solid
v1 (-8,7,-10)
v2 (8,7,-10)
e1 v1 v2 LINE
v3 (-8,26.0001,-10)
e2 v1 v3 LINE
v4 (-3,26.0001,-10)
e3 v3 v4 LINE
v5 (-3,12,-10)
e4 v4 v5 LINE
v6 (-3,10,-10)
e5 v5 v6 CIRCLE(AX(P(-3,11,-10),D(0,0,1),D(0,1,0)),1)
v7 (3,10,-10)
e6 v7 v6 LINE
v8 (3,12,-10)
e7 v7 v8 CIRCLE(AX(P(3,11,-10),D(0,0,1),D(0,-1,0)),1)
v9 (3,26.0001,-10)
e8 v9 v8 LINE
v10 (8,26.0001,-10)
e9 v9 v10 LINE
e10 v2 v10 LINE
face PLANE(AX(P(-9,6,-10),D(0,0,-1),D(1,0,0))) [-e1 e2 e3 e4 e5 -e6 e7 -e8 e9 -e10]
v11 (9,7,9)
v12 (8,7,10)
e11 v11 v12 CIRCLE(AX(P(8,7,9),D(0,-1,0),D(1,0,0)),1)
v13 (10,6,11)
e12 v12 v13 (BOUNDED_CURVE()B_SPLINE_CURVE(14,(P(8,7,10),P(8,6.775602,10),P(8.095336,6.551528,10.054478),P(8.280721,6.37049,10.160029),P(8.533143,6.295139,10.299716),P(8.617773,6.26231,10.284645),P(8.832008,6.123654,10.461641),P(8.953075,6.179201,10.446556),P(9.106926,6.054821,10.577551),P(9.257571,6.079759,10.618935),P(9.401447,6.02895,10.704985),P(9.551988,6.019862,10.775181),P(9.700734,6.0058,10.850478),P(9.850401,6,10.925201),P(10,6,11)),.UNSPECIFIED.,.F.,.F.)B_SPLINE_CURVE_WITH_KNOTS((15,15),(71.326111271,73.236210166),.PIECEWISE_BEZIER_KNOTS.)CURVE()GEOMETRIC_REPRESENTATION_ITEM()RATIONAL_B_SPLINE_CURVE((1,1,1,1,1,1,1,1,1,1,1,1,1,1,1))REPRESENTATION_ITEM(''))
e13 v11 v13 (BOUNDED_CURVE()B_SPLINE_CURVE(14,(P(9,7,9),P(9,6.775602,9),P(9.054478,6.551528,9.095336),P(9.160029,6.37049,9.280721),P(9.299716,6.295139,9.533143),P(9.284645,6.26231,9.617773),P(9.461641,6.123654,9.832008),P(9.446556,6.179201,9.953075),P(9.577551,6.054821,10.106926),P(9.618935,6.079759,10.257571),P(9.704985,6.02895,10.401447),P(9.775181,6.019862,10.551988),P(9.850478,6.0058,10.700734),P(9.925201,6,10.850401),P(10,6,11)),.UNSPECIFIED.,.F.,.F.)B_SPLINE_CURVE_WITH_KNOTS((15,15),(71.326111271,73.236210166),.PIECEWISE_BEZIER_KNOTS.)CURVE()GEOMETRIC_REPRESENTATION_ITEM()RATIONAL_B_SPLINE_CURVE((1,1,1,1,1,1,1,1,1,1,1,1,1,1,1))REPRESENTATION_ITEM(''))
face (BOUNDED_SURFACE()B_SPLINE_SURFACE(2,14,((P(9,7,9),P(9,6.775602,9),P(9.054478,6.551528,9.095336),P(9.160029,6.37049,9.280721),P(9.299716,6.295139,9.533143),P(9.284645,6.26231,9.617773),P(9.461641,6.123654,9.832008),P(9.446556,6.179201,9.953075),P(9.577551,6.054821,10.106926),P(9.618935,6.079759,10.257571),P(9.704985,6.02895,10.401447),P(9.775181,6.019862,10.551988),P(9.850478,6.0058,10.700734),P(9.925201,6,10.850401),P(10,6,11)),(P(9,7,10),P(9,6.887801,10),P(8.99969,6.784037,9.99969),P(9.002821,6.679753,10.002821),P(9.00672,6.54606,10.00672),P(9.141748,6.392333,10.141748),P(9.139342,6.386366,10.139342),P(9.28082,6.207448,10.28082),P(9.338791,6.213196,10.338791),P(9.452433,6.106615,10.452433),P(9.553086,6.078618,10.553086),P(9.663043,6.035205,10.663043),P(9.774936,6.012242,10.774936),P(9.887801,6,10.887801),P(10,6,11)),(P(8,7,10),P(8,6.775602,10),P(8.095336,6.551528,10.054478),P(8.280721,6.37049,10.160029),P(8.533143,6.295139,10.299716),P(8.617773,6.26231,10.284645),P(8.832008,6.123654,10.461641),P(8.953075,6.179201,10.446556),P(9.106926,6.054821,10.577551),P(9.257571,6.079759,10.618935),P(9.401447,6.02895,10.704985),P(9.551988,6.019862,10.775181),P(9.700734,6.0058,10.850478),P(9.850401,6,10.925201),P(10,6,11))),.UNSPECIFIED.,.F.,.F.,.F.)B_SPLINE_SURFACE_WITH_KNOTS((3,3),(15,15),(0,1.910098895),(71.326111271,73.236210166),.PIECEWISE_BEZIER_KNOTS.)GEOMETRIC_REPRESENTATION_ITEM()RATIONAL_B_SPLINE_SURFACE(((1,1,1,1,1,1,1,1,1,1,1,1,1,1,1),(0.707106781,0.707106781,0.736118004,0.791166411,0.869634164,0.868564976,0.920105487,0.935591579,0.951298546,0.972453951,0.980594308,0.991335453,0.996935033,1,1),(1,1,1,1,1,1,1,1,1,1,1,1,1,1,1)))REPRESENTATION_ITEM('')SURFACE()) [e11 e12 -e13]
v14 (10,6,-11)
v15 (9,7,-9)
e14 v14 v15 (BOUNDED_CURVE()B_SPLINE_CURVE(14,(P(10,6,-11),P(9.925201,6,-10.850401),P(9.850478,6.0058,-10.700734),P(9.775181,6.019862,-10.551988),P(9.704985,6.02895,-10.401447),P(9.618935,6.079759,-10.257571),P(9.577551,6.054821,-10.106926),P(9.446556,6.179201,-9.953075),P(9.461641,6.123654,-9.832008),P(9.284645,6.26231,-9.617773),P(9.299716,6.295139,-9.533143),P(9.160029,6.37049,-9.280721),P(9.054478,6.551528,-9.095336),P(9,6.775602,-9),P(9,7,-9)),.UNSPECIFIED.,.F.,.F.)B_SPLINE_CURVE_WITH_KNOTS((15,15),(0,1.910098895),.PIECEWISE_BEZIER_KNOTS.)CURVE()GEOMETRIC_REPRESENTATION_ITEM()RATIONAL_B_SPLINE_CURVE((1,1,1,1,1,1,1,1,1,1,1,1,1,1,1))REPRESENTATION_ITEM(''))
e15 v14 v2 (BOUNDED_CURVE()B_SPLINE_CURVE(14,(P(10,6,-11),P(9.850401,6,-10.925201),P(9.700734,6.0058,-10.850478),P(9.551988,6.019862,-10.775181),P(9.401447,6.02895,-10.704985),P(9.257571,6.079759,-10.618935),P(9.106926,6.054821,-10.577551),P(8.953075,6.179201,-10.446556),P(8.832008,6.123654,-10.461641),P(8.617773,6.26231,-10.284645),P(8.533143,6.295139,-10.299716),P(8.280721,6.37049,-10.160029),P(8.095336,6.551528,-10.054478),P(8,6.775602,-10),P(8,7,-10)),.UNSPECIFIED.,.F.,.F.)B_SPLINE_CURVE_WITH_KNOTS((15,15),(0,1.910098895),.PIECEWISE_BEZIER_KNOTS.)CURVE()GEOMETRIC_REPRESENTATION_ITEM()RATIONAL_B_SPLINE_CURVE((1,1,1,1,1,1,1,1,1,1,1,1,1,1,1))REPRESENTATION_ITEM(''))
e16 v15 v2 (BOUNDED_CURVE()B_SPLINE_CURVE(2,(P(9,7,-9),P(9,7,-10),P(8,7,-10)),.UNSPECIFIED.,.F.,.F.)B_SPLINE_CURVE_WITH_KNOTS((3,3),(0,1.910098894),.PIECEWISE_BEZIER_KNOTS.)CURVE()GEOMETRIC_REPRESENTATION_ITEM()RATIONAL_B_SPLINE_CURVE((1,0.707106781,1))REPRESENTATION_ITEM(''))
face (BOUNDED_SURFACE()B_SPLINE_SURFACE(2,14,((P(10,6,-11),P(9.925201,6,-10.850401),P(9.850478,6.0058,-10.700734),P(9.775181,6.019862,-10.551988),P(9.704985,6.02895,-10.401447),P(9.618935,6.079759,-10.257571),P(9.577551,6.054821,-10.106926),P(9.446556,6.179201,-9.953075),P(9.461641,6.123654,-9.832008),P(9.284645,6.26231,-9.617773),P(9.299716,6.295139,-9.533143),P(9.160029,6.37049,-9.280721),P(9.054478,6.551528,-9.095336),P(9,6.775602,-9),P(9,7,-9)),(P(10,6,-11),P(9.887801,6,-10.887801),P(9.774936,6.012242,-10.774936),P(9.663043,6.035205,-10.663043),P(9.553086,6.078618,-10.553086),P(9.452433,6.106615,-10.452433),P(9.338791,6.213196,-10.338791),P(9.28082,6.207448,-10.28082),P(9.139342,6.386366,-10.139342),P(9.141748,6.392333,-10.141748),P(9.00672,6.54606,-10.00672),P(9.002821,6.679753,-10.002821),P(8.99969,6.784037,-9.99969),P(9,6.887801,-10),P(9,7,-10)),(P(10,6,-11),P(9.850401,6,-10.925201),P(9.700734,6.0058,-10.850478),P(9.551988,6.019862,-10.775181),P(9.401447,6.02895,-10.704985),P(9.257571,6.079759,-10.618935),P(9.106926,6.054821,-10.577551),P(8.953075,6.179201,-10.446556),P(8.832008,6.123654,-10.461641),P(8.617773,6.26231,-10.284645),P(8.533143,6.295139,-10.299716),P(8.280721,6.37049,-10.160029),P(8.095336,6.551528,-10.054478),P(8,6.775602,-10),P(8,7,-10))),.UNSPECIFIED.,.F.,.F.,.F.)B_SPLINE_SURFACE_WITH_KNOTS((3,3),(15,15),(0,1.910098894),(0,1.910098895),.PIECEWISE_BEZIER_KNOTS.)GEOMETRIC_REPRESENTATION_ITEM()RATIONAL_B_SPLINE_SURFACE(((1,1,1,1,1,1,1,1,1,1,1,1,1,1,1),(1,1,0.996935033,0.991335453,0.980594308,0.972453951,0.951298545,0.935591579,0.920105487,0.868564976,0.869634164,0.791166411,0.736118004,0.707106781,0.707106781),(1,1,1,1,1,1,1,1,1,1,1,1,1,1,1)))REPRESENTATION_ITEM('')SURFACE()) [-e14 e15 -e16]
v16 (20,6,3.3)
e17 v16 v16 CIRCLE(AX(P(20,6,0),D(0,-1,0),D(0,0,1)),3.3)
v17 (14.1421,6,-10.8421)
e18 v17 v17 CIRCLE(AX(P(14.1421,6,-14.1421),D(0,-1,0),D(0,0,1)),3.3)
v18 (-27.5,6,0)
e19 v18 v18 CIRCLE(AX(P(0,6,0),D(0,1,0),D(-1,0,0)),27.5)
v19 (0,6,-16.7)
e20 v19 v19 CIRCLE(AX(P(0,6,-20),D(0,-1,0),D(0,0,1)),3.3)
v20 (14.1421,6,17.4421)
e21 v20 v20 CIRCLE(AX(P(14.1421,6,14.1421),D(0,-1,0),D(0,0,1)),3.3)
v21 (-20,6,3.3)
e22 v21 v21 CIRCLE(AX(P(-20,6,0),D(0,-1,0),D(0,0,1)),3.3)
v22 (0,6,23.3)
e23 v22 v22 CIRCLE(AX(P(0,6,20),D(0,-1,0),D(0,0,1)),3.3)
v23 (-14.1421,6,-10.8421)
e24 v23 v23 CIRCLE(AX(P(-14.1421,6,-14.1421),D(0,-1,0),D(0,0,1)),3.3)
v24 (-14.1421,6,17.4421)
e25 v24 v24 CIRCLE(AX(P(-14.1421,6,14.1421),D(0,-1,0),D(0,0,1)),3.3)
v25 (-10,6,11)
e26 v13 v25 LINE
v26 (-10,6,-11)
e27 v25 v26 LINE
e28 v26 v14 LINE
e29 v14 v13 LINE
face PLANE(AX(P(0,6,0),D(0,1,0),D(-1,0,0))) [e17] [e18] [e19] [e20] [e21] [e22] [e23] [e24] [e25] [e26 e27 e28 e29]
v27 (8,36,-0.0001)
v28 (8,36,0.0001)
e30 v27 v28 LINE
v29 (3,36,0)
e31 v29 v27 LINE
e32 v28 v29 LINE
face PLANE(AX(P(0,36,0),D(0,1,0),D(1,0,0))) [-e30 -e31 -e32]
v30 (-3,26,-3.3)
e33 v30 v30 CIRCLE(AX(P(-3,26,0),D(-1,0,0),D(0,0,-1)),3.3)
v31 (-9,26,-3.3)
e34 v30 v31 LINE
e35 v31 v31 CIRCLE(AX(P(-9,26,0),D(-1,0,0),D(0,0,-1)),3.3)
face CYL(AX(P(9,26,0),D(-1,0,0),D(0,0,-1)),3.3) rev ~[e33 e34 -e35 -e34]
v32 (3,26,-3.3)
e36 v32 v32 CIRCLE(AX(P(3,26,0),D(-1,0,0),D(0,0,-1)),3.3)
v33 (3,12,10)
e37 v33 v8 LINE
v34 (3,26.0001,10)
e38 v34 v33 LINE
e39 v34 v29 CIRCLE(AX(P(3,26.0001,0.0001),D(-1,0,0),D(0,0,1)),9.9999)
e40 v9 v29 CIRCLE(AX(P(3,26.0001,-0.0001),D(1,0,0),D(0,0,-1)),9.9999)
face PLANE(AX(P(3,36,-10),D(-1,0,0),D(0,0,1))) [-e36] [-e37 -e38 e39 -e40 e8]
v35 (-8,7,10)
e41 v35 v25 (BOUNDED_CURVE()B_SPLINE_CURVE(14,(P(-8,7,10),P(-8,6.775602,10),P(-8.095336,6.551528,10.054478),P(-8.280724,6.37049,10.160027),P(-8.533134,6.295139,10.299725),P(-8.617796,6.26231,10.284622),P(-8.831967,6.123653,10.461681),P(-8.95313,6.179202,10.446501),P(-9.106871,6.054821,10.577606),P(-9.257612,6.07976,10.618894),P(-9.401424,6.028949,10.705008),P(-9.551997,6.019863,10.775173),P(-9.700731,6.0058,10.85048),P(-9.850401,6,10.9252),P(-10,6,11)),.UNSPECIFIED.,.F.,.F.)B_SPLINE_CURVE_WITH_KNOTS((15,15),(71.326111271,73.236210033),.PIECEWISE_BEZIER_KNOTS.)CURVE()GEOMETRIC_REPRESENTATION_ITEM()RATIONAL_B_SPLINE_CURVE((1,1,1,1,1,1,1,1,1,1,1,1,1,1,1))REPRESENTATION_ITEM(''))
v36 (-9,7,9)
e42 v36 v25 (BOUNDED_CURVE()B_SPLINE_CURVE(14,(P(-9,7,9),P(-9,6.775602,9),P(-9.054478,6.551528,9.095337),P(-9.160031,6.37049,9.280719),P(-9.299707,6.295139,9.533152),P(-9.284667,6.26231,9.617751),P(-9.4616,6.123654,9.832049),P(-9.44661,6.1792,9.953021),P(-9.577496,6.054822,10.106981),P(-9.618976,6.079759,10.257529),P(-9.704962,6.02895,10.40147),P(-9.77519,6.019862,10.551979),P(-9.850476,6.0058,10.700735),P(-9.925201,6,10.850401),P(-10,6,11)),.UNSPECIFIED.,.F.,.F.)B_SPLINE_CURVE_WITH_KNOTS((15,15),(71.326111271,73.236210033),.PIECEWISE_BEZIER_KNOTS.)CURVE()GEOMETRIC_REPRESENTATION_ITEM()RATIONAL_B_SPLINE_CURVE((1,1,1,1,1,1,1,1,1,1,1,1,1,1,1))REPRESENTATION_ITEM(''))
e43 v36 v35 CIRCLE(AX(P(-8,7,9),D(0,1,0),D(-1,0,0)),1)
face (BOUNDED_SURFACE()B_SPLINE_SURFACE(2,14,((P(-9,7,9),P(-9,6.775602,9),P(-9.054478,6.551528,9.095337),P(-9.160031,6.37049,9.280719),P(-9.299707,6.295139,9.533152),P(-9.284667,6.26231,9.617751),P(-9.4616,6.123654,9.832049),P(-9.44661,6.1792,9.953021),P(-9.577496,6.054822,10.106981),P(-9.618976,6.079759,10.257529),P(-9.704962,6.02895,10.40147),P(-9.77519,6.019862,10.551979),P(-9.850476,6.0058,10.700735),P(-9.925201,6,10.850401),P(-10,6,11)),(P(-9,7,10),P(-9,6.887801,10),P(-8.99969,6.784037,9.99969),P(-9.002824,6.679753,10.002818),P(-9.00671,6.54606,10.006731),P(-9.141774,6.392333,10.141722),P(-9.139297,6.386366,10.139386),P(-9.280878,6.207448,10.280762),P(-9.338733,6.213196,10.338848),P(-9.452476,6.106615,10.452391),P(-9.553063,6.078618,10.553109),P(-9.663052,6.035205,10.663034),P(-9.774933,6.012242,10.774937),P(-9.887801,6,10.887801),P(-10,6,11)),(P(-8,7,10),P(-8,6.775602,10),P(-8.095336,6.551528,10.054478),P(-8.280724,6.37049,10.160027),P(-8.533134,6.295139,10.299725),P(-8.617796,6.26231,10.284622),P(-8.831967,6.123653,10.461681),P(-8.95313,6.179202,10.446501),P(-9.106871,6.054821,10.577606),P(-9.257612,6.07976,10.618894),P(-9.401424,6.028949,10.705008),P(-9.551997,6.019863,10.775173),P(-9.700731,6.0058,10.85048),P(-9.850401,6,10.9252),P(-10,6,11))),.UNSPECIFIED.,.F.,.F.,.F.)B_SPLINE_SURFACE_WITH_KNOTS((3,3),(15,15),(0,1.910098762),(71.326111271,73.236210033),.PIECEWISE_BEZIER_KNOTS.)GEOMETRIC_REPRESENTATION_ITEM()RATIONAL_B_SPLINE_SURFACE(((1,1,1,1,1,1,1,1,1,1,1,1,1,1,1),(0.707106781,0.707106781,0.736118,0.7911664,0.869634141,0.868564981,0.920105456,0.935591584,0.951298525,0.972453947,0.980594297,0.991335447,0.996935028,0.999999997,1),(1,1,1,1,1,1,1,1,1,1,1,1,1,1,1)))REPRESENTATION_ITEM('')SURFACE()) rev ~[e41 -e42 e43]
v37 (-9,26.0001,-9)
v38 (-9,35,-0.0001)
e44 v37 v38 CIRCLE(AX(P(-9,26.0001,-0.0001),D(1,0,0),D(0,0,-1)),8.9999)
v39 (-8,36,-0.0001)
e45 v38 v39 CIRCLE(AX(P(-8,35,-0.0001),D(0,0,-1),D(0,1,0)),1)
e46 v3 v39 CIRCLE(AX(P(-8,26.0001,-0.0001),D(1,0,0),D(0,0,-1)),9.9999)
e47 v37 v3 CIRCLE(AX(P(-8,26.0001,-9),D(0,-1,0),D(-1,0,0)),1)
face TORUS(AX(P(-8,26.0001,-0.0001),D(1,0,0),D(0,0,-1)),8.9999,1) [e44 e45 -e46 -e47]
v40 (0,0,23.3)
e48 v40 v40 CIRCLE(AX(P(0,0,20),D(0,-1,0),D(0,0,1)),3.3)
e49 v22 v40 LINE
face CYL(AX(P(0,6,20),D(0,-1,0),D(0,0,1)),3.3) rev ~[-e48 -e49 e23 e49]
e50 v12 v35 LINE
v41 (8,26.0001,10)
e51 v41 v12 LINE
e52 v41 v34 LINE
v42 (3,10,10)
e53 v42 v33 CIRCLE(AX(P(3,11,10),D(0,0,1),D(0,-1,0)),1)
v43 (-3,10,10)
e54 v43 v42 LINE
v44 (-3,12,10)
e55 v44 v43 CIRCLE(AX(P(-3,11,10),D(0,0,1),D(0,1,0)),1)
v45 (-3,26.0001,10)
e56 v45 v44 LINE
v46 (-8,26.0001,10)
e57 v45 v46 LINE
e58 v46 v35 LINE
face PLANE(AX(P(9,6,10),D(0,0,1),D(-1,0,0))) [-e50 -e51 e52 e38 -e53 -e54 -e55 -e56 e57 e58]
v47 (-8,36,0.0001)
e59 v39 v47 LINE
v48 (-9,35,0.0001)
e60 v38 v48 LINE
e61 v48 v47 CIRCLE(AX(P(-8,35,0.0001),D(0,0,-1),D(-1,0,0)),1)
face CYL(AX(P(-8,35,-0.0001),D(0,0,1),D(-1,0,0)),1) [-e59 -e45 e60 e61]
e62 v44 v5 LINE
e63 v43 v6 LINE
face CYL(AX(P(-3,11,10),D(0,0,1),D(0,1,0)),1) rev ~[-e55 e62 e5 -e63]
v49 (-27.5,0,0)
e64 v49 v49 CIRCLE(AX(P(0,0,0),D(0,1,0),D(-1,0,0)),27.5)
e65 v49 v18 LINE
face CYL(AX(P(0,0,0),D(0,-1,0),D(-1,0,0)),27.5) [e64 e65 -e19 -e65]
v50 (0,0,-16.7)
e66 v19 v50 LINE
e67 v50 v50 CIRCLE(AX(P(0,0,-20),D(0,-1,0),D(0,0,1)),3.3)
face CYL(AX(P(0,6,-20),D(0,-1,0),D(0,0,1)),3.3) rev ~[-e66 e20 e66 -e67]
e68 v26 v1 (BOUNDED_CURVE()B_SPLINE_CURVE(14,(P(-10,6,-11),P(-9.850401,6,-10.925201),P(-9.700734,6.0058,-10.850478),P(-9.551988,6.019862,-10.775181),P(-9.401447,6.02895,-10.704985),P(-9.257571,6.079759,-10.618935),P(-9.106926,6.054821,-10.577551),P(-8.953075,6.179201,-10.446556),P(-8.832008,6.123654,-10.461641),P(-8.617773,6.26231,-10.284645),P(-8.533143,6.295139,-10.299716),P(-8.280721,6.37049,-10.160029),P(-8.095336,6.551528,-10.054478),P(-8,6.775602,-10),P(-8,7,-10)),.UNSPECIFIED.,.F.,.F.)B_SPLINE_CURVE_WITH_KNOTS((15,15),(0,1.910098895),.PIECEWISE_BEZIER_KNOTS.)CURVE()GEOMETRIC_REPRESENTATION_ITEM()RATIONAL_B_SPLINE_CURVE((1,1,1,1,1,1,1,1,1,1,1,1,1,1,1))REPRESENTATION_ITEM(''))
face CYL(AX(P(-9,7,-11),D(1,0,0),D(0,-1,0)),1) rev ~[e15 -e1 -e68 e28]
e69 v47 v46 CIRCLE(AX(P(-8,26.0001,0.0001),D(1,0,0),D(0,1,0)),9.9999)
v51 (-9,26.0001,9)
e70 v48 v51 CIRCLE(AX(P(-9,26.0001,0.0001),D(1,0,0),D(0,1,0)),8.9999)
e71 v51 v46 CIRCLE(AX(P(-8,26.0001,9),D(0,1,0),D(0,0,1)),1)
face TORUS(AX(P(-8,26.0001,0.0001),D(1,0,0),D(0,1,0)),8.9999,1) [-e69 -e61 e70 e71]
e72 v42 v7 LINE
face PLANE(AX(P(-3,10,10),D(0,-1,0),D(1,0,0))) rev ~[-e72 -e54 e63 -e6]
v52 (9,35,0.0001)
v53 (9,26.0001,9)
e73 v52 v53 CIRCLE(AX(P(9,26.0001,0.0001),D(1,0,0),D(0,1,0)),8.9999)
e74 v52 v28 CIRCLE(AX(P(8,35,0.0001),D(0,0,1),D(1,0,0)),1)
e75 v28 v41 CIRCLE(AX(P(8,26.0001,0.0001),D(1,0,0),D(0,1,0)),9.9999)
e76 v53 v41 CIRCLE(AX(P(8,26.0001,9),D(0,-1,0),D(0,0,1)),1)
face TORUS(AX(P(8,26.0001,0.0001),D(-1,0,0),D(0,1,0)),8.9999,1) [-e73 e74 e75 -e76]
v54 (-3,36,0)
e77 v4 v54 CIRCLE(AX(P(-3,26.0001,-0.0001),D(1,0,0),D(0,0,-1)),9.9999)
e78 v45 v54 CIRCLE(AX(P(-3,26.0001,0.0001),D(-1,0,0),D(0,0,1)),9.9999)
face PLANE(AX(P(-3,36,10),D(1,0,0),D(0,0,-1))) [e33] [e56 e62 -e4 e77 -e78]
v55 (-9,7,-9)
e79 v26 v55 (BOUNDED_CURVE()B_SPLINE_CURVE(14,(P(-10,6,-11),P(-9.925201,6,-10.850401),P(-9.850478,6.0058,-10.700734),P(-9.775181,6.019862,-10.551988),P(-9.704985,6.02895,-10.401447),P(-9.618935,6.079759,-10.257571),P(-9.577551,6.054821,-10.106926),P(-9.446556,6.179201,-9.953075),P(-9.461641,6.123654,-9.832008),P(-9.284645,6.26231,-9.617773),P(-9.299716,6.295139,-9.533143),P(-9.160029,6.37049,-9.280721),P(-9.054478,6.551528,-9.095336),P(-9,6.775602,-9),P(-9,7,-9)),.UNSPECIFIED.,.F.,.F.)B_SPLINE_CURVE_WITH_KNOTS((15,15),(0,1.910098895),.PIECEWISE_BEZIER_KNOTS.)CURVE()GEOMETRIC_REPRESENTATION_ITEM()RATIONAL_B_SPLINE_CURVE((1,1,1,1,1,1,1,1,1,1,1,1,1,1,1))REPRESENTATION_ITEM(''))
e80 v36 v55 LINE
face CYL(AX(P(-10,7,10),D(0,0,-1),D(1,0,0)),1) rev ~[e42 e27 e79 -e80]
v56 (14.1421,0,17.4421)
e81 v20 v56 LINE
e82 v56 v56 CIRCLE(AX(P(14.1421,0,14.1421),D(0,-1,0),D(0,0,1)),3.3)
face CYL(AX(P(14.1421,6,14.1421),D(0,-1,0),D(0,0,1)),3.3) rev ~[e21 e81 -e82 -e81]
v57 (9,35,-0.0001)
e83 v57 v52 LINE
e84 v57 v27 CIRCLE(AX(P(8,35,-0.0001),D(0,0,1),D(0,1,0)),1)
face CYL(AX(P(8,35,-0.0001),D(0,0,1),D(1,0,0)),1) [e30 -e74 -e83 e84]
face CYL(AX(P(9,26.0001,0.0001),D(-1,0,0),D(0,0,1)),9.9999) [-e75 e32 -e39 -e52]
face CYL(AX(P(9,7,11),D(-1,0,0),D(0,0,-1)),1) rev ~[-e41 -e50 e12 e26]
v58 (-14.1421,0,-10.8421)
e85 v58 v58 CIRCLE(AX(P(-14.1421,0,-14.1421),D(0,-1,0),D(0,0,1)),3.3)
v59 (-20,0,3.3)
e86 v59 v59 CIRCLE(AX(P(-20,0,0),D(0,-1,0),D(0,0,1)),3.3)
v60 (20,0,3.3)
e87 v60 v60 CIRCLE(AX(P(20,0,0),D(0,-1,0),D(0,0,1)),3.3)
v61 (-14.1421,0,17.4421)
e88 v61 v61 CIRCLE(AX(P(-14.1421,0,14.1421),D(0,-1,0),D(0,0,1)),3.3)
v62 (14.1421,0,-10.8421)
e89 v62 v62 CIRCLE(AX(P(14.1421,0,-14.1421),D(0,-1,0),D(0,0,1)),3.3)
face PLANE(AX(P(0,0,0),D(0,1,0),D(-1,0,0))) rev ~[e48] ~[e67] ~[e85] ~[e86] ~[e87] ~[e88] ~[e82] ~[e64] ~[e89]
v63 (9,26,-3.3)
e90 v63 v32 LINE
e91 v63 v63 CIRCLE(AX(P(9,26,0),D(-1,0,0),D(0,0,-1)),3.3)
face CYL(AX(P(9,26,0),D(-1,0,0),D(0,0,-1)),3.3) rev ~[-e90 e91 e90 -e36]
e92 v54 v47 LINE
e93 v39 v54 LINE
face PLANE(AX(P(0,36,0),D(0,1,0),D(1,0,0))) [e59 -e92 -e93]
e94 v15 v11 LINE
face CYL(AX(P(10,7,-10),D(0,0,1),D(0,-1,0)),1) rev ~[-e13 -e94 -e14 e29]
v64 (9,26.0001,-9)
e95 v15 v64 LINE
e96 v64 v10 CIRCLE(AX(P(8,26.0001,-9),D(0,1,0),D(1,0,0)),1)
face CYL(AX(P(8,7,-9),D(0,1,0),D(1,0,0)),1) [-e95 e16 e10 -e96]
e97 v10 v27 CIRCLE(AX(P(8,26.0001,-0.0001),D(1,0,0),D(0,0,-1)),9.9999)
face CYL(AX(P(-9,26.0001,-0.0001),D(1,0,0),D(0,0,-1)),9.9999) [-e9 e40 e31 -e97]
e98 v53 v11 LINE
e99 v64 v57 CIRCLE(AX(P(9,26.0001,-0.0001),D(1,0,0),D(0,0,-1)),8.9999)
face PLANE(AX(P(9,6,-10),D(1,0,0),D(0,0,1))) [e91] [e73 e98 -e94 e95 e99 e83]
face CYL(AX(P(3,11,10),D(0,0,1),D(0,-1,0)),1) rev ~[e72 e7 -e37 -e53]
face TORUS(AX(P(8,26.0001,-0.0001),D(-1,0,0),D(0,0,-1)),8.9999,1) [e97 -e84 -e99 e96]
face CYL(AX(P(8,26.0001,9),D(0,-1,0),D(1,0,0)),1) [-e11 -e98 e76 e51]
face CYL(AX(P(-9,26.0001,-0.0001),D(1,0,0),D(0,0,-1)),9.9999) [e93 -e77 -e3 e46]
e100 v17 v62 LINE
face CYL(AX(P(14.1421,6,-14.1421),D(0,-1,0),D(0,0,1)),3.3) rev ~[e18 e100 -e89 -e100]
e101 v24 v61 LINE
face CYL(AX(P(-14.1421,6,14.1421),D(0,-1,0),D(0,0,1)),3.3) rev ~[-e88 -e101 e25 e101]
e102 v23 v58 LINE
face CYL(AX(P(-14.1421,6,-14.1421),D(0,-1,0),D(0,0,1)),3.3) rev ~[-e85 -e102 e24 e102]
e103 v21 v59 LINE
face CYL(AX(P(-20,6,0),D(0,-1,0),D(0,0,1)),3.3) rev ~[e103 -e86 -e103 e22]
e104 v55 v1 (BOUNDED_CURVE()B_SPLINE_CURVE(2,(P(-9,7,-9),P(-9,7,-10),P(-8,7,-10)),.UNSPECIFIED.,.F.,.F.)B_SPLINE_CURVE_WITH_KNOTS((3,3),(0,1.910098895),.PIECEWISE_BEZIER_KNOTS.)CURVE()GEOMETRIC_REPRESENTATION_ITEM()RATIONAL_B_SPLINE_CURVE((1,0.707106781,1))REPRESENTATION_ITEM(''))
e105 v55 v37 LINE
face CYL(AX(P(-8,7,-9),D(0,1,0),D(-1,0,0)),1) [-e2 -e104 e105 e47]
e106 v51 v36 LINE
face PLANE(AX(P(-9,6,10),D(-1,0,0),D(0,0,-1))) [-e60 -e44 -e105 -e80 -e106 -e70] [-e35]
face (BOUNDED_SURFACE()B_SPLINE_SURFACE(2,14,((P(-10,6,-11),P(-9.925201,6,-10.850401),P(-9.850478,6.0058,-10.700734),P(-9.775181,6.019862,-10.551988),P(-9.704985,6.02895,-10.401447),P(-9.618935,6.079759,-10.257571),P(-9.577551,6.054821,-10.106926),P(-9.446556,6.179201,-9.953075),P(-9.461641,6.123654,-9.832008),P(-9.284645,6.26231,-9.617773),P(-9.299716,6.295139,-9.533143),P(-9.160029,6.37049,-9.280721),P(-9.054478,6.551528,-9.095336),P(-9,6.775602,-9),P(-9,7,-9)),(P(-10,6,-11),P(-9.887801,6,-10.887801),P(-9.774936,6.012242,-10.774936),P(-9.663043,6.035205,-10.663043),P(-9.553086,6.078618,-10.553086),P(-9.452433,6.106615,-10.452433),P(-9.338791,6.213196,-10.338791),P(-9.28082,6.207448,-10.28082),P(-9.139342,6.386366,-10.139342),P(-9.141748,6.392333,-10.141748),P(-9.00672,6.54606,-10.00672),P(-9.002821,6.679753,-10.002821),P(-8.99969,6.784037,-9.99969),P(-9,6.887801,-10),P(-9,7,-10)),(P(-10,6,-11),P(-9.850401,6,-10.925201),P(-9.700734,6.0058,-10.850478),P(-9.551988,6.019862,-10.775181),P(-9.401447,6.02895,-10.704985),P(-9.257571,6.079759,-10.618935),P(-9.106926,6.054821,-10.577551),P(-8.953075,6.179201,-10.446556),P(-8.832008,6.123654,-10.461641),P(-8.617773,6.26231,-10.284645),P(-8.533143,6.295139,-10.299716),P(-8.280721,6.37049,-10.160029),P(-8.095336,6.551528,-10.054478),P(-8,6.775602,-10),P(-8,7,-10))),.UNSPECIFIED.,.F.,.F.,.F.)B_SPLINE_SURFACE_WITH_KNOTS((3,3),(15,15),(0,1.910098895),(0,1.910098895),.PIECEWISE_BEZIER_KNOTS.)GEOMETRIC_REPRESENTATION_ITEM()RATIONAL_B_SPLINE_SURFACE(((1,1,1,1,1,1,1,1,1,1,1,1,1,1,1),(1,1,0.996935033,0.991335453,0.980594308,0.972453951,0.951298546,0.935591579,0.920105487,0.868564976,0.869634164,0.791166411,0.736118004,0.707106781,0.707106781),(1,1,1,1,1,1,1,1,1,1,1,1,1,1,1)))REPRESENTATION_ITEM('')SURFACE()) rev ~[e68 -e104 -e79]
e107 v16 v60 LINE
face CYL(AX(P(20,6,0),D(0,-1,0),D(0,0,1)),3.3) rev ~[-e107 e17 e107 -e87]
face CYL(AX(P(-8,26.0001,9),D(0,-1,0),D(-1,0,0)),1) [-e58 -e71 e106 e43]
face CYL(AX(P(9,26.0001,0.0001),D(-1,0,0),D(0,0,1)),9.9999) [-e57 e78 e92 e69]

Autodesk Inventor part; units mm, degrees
ref_plane "YZ Plane" through (0, 0, 0) normal (1, 0, 0) x (0, 1, 0)
ref_plane "XZ Plane" through (0, 0, 0) normal (0, 1, 0) x (-1, 0, 0)
ref_plane "XY Plane" through (0, 0, 0) normal (0, 0, 1) x (1, 0, 0)
sketch "Sketch1" plane through (0, 0, 0) normal (0, 1, 0) x (-1, 0, 0)
  circle A0 centre (0, 0) radius 27.5
  dimension "d0" = 55
extrude "Extrusion1" add sketch "Sketch1" along normal blind 6
sketch "Sketch2" plane through (0, 6, 0) normal (0, 1, 0) x (1, 0, 0)
  circle A0 centre (0, 0) radius 27.5 projected
  point P0 (20, 0)
  point P1 (14.1421, 14.1421)
  point P2 (0, 20)
  point P3 (-14.1421, 14.1421)
  point P4 (-20, 0)
  point P5 (-14.1421, -14.1421)
  point P6 (0, -20)
  point P7 (14.1421, -14.1421)
  dimension "d3" = 20
  dimension "d6" = 360
hole "Hole1" at (20, 6, 0) at (14.1421, 6, -14.1421) at (0, 6, -20) at (-14.1421, 6, -14.1421) at (-20, 6, 0) at (-14.1421, 6, 14.1421) at (0, 6, 20) at (14.1421, 6, 14.1421) direction (0, -1, 0) diameter 6.6 depth 8 tip angle 118 clearance for "Flat Head Machine Screw" size "M6" standard "Ansi Metric M Profile"
sketch "Sketch8" plane through (0, 6, 0) normal (0, 1, 0) x (1, 0, 0)
  circle A0 centre (0, 0) radius 27.5 projected
  line L0 (-9, 10) -> (9, 10)
  line L1 (9, 10) -> (9, -10)
  line L2 (9, -10) -> (-9, -10)
  line L3 (-9, -10) -> (-9, 10)
  point P0 (0, 10)
  point P1 (9, 0)
  dimension "d28" = 18
  dimension "d30" = 20
extrude "Extrusion3" add sketch "Sketch8" along normal blind 30 contours L0 L1 L2 L3
sketch "Sketch9" plane through (0, 36, 0) normal (0, 1, 0) x (1, 0, 0)
  line L0 (9, 10) -> (-9, 10) projected
  line L1 (-9, -10) -> (9, -10) projected
  line L2 (-3, 10) -> (3, 10)
  line L3 (3, 10) -> (3, -10)
  line L4 (3, -10) -> (-3, -10)
  line L5 (-3, -10) -> (-3, 10)
  point P0 (0, 0)
  point P1 (0, 10)
  point P2 (0, 10)
  dimension "d54" = 6
sketch "Sketch10" plane through (9, 6, 10) normal (1, 0, 0) x (0, 0, -1)
  line L0 (20, 0) -> (0, 0) projected
  line L1 (20, 0) -> (20, 30) projected
  line L2 (0, 30) -> (20, 30) projected
  line L3 (0, 0) -> (0, 30) projected
  point P0 (10, -6)
fillet "Fillet2" radius 10 2 edges at (0, 36, 10) (0, 36, -10)
sketch "Sketch11" plane through (9, 6, 10) normal (1, 0, 0) x (0, 0, -1)
  arc A0 (20, 20) -> (0, 20) centre (10, 20) ccw projected
  point P0 (10, -6)
hole "Hole3" at (9, 26, 0) direction (-1, 0, 0) diameter 6.6 end through all clearance for "Flat Head Machine Screw" size "M6" standard "Ansi Metric M Profile"
extrude "Extrusion4" cut sketch "Sketch9" against normal blind 25
sketch "Sketch12" plane through (-9, 6, 10) normal (0, 0, 1) x (1, 0, 0)
  line L0 (6, 5) -> (6, 20) projected
  line L1 (12, 20) -> (12, 5) projected
  line L2 (12, 5) -> (6, 5) projected
  arc A0 (6, 6) -> (6, 4) centre (6, 5) ccw
  line L3 (6, 5) -> (6, 4) construction
  line L4 (6, 5) -> (6, 6) construction
  arc A1 (12, 4) -> (12, 6) centre (12, 5) ccw
  line L5 (12, 5) -> (12, 4) construction
  line L6 (12, 5) -> (12, 6) construction
  line L7 (6, 6) -> (12, 6)
  line L8 (6, 4) -> (12, 4)
  point P0 (9, -6)
  dimension "d45" = 1
  dimension "d46" = 180
  dimension "d47" = 1
  dimension "d48" = 180
extrude "Extrusion5" cut sketch "Sketch12" against normal through all contours L2 L1 A1 L8 A0 L0
fillet "Fillet3" radius 1 4 edges at (0, 6, 10) (-9, 6, 0) (9, 6, 0) (0, 6, -10)
fillet "Fillet4" radius 1 10 edges at (9, 33.0711, -7.0711) (9, 16.5001, -10) (9.2929, 6.2929, -10.2929) (9.2929, 6.2929, 10.2929) (9, 16.5001, 10) (-9, 33.0711, -7.0711) (-9, 16.5001, 10) (-9.2929, 6.2929, 10.2929) (-9.2929, 6.2929, -10.2929) (-9, 16.5001, -10)
properties part number "right_angle_holder"
